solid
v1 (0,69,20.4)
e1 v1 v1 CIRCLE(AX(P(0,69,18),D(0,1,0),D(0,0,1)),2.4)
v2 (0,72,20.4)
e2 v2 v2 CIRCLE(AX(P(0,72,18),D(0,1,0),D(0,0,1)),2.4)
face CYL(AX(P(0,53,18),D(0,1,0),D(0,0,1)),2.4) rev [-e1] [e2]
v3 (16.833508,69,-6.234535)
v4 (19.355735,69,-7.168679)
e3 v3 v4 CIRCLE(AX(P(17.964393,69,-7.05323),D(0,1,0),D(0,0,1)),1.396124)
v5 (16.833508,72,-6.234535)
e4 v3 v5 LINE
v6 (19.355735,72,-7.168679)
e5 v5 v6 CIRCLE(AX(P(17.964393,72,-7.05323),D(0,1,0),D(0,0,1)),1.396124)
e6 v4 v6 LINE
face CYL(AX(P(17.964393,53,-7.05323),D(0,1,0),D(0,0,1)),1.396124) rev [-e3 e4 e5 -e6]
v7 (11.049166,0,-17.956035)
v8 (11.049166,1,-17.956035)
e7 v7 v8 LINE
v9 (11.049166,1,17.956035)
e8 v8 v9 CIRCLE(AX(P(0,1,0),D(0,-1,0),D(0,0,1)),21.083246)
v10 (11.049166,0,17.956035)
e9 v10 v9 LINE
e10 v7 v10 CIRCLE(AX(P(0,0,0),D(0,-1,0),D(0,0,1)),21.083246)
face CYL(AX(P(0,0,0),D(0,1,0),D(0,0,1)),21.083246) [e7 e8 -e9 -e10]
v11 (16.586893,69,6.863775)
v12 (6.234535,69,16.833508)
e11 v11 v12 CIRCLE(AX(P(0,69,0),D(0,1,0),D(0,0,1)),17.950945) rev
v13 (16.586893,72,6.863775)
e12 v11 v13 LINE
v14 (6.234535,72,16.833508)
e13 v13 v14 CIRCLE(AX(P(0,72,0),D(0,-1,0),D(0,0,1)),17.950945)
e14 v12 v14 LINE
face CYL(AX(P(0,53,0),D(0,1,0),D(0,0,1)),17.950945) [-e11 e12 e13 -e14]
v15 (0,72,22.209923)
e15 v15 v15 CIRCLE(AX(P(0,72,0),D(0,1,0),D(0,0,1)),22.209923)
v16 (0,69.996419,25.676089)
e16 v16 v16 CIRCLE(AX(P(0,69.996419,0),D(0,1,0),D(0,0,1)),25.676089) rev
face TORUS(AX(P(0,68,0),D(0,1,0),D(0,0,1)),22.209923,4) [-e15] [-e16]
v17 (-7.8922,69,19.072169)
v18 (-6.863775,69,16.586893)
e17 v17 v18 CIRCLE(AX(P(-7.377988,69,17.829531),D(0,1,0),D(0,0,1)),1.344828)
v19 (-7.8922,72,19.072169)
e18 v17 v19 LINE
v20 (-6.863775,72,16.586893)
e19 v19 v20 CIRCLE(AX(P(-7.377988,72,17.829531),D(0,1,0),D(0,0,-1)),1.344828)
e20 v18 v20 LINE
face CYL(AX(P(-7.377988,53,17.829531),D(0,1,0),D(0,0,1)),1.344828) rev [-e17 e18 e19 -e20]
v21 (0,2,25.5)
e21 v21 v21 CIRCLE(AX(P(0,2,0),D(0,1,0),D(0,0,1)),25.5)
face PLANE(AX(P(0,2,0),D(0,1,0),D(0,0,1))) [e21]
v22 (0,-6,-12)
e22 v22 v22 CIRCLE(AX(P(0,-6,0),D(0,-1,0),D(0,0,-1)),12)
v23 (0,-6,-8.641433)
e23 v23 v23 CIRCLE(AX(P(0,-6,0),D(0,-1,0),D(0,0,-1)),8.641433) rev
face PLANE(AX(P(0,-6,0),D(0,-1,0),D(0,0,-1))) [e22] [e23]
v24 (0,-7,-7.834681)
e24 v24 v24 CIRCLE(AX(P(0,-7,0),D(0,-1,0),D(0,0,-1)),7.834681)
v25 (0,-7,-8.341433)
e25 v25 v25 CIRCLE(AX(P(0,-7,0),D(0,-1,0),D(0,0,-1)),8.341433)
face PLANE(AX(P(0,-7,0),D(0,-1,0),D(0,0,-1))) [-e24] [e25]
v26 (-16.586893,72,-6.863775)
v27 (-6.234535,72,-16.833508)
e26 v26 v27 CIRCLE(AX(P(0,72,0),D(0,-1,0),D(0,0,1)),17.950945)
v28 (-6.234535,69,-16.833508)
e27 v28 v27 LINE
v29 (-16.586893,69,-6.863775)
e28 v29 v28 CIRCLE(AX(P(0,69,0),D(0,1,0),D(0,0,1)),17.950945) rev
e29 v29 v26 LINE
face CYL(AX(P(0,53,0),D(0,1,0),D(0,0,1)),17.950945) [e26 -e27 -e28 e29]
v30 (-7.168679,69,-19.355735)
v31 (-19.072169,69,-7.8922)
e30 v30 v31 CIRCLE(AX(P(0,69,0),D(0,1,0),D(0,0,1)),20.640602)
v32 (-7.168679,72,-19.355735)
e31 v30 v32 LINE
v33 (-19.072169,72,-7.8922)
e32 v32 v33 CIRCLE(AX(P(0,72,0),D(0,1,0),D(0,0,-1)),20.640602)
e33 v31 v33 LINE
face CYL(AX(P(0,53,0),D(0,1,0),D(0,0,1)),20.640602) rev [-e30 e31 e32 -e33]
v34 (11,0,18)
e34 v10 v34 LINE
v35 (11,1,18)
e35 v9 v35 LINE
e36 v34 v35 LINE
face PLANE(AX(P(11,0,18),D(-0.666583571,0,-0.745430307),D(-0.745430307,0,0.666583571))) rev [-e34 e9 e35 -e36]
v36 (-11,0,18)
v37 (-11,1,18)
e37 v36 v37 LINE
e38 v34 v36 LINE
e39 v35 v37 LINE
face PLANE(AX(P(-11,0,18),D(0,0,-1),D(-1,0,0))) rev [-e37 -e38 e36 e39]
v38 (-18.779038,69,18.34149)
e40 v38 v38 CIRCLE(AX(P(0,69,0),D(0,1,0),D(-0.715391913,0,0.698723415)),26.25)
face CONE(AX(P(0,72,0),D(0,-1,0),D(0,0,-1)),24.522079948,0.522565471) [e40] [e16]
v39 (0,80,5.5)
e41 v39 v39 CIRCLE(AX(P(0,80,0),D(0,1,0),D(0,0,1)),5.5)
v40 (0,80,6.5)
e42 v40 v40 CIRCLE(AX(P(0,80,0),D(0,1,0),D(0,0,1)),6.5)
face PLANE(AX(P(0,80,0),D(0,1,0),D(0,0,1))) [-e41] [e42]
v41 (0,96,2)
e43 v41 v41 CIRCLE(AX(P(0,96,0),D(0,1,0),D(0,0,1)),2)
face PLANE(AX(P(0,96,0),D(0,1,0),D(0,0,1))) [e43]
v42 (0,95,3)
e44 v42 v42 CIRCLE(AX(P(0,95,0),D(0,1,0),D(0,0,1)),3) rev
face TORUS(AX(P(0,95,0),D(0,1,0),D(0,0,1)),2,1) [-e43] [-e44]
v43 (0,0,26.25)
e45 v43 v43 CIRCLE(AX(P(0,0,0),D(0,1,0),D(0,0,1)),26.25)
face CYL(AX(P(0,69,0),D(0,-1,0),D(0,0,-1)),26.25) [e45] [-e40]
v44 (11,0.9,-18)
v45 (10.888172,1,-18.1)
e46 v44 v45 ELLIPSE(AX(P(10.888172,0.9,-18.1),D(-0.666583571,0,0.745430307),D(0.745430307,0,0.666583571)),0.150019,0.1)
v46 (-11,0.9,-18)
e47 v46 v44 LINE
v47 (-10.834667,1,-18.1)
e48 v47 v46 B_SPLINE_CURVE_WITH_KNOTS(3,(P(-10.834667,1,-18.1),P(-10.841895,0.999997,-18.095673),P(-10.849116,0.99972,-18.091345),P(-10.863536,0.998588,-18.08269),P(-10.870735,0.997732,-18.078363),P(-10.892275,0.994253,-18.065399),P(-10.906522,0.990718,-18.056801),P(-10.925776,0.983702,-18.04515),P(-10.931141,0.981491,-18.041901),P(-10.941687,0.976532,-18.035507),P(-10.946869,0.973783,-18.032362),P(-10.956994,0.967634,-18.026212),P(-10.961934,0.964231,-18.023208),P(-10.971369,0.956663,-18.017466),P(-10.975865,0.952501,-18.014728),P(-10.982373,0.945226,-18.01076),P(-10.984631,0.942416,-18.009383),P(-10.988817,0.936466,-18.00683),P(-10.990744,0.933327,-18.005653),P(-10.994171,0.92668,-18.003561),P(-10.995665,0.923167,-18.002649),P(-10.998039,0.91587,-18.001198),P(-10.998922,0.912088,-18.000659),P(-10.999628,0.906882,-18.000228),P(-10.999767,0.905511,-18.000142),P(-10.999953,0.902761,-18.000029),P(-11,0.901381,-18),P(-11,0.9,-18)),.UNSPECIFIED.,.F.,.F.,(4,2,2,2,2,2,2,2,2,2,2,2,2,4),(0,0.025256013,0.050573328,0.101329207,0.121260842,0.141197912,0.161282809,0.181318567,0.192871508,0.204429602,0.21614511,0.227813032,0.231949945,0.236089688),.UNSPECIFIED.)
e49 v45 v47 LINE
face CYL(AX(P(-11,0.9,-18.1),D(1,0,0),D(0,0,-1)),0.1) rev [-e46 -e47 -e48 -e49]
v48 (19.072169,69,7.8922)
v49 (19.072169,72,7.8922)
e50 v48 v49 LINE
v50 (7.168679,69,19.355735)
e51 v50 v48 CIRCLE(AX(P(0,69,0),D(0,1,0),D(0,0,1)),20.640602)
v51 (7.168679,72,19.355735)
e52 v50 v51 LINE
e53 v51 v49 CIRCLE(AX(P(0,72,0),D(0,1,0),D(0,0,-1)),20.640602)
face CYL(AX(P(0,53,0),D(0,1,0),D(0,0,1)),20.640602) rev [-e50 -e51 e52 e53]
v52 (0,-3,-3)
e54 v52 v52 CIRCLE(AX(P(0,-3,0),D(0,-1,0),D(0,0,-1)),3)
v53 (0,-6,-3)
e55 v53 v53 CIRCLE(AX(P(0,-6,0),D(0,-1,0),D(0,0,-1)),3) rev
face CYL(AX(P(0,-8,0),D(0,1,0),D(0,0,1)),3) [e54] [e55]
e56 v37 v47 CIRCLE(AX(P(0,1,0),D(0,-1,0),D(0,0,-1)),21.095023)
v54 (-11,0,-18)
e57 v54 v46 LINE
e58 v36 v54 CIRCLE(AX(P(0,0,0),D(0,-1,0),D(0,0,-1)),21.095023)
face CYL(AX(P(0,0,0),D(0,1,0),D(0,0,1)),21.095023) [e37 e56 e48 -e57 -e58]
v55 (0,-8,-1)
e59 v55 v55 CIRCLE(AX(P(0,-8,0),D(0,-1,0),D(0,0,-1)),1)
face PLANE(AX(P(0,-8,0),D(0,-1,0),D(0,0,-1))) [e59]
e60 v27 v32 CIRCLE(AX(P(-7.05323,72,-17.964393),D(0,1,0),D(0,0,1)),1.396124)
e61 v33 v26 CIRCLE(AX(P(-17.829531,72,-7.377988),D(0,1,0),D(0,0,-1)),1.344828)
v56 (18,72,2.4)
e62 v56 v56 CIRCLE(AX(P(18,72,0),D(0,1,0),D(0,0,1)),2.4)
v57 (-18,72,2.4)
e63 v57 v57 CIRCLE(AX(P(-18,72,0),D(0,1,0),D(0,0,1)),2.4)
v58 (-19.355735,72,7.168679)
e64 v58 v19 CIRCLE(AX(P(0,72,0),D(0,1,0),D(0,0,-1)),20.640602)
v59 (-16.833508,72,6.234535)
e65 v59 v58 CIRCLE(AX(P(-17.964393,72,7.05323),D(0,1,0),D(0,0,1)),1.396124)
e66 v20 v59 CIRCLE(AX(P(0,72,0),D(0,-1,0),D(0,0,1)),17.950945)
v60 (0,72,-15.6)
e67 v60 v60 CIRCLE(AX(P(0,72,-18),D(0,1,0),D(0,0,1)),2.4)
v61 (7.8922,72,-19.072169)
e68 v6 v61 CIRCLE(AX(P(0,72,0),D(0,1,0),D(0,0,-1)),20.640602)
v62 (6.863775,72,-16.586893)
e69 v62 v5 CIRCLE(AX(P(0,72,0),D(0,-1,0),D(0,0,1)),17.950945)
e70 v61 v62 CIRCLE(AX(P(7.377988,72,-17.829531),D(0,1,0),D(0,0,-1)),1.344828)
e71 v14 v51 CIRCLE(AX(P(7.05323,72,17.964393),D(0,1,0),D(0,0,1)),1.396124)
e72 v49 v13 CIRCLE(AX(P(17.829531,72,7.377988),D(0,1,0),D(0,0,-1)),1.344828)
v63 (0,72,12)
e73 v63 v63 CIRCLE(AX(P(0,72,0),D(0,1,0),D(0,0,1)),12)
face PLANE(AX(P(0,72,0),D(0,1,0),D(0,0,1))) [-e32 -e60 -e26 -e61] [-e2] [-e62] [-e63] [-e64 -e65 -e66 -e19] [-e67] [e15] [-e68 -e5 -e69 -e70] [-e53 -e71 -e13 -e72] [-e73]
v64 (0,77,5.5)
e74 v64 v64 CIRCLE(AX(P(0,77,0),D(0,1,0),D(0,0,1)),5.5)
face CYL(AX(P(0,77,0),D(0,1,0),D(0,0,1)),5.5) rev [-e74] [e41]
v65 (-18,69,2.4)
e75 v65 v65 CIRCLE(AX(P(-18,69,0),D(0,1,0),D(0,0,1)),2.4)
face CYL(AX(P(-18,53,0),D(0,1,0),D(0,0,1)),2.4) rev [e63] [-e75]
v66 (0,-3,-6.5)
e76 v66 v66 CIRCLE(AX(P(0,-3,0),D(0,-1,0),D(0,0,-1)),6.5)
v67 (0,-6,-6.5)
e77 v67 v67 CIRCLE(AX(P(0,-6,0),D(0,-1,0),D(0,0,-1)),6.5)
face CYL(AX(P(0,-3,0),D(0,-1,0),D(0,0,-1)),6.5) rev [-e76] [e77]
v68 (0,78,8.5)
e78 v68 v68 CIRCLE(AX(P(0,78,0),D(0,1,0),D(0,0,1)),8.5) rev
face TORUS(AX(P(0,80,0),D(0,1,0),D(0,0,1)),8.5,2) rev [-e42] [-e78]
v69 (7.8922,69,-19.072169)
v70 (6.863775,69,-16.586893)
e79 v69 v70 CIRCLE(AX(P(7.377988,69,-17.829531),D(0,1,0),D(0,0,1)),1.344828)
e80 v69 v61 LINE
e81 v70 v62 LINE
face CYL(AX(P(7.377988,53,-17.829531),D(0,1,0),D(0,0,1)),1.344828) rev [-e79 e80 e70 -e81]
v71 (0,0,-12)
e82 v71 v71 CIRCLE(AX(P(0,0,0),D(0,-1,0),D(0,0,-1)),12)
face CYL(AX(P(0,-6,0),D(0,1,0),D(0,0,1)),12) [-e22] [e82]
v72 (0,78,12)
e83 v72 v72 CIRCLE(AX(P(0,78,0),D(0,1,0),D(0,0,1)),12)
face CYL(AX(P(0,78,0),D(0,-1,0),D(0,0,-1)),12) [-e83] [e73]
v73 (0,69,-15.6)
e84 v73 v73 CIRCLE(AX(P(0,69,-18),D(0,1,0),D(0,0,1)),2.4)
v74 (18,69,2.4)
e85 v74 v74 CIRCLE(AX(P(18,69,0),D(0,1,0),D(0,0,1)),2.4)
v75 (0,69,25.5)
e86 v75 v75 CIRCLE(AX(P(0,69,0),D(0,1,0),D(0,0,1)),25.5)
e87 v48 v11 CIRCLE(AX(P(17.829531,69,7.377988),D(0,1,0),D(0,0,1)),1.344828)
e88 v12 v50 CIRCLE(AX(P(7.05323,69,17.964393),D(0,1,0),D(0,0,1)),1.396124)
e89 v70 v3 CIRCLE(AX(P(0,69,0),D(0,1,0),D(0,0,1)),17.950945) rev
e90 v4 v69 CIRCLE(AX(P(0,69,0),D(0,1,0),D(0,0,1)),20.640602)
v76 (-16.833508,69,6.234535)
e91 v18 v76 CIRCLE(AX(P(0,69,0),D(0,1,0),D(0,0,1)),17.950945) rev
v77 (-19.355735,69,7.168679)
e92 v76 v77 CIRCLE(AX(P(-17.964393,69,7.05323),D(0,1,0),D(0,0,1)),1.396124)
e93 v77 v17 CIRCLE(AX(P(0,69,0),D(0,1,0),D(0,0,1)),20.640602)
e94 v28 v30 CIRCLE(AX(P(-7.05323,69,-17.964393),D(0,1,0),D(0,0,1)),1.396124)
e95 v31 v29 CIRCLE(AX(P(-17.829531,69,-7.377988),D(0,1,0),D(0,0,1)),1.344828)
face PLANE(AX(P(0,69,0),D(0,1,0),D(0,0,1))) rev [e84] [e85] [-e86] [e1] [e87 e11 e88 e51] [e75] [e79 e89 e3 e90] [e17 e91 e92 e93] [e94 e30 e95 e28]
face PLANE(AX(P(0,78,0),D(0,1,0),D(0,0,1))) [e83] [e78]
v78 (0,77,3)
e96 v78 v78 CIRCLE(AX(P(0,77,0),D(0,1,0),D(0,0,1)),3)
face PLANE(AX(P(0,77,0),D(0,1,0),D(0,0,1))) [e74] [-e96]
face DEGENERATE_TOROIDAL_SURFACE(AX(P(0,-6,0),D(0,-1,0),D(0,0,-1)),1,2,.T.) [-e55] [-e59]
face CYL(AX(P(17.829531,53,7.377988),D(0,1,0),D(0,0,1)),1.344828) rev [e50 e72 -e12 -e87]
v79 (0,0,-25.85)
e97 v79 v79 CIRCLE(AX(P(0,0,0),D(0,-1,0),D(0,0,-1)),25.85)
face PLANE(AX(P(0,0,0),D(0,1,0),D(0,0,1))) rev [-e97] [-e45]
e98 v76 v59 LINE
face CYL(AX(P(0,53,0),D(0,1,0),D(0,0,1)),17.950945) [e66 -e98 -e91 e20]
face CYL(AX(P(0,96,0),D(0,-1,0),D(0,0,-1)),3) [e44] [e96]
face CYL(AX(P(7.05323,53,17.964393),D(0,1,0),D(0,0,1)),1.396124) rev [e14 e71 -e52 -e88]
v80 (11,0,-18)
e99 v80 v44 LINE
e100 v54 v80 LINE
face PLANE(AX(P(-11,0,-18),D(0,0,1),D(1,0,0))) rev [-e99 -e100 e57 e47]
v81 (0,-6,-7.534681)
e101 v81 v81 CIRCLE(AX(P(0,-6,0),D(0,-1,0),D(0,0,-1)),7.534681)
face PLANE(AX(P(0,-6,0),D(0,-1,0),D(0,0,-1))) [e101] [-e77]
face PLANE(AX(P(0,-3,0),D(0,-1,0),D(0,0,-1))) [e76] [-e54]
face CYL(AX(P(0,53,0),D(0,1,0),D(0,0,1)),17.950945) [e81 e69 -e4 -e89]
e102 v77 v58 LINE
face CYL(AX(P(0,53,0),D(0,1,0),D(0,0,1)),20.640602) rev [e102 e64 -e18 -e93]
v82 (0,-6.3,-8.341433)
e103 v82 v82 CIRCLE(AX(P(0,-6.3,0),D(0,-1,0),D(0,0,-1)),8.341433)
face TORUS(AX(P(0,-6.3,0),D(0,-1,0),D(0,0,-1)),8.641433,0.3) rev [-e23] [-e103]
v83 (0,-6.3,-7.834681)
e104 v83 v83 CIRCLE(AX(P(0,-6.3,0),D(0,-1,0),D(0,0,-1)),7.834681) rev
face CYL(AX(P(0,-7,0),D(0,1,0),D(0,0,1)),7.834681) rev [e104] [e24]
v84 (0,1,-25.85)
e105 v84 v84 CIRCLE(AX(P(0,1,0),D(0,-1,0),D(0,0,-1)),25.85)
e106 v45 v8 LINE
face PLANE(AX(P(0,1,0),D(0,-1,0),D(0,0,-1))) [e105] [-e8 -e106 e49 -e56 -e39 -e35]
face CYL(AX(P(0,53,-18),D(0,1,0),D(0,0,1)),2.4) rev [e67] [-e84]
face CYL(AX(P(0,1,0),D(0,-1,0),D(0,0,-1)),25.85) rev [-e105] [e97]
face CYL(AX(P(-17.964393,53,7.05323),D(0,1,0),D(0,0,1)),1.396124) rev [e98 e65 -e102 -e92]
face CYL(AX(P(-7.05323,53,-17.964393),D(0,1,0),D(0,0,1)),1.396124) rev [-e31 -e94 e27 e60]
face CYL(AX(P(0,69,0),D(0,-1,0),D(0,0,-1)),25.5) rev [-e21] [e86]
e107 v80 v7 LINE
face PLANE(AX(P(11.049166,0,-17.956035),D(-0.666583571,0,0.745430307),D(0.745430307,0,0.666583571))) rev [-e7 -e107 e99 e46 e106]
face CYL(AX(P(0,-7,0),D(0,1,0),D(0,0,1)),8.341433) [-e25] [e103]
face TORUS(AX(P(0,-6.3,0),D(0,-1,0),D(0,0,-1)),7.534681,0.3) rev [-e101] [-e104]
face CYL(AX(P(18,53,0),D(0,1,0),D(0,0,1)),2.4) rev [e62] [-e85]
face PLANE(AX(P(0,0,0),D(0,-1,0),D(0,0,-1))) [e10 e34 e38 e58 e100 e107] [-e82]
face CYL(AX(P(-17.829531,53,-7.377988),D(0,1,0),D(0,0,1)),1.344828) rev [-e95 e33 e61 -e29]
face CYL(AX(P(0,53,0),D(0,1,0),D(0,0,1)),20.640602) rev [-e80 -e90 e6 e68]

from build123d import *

# Parameters (mm, degrees)
SKETCH1_R            = 26.25
SKETCH1_R_2          = 25.5
BOSS_EXTRUDE1_DEPTH  = 69
SKETCH2_R            = 26.25
BOSS_EXTRUDE2_DEPTH  = 2
SKETCH3_R            = 24.522079948
BOSS_EXTRUDE3_DEPTH  = 1
FILLET1_R            = 4
SKETCH4_R            = 12
BOSS_EXTRUDE4_DEPTH  = 6
SKETCH5_R            = 6.5
BOSS_EXTRUDE5_DEPTH  = 2
SKETCH6_R            = 5.5
CUT_EXTRUDE1_DEPTH   = 3
FILLET3_R            = 2
SKETCH7_R            = 3
BOSS_EXTRUDE6_DEPTH  = 19
FILLET4_R            = 1
SKETCH9_R            = 2.4
CUT_EXTRUDE2_DEPTH   = 19
CUT_EXTRUDE3_DEPTH   = 19
SKETCH12_R           = 25.85
CUT_EXTRUDE4_DEPTH   = 1
BOSS_EXTRUDE7_DEPTH  = 1
FILLET6_R            = 0.1
BOSS_EXTRUDE8_START  = 6
SKETCH15_R           = 12
BOSS_EXTRUDE8_DEPTH  = 6
SKETCH16_R           = 6.5
CUT_EXTRUDE5_DEPTH   = 3
SKETCH17_R           = 8.341433134
SKETCH17_R_2         = 7.834680873
BOSS_EXTRUDE9_DEPTH  = 1
FILLET9_R            = 0.3
FILLET10_R           = 0.3
BOSS_EXTRUDE10_START = 5
SKETCH18_R           = 3
BOSS_EXTRUDE10_DEPTH = 5
FILLET11_R           = 2


# Read off the part's stored shape, not the designer's step: Boundary1
with BuildPart() as part:
    # Sketch1 → Boss-Extrude1 (new body)
    with BuildSketch(Plane(origin=(0, 0, 0), x_dir=(1, 0, 0), z_dir=(0, 1, 0))):
        with Locations(Location((0, 0, 0), (0, 0, 270))):
            Circle(SKETCH1_R)
        with Locations(Location((0, 0, 0), (0, 0, 270))):
            Circle(SKETCH1_R_2, mode=Mode.SUBTRACT)
    extrude(amount=BOSS_EXTRUDE1_DEPTH)

    # Sketch2 → Boss-Extrude2 (add)
    with BuildSketch(Plane(origin=(0, 0, 0), x_dir=(1, 0, 0), z_dir=(0, 1, 0))):
        with Locations(Location((0, 0, 0), (0, 0, 270))):
            Circle(SKETCH2_R)
    extrude(amount=BOSS_EXTRUDE2_DEPTH)



with BuildPart() as body_2:
    # Sketch3 → Boss-Extrude3 (new body)
    with BuildSketch(Plane(origin=(0, 71, 0), x_dir=(1, 0, 0), z_dir=(0, 1, 0))):
        with Locations(Location((0, 0, 0), (0, 0, 270))):
            Circle(SKETCH3_R)
    extrude(amount=BOSS_EXTRUDE3_DEPTH)


with BuildPart() as part_1:
    add(part.part)

    add(body_2.part)  # Boundary1 merges body 2
    # Boundary1 outline → Boundary1 (revolve)
    with BuildSketch(Plane.XY):
        Polygon((24.522079948, 72), (24.522079948, 71), (0, 71), (0, 69), (26.25, 69), align=None)
    revolve(axis=Axis((0, 0, 0), (0, 1, 0)))

    # Fillet1
    fillet1_edges = [part_1.edges().sort_by_distance(p)[0] for p in [
        (-24.522079948, 72, 0),
    ]]
    fillet(fillet1_edges, radius=FILLET1_R)

    # Sketch4 → Boss-Extrude4 (add)
    with BuildSketch(Plane(origin=(0, 72, 0), x_dir=(1, 0, 0), z_dir=(0, 1, 0))):
        with Locations(Location((0, 0, 0), (0, 0, 270))):
            Circle(SKETCH4_R)
    extrude(amount=BOSS_EXTRUDE4_DEPTH)

    # Sketch5 → Boss-Extrude5 (add)
    with BuildSketch(Plane(origin=(0, 78, 0), x_dir=(1, 0, 0), z_dir=(0, 1, 0))):
        with Locations(Location((0, 0, 0), (0, 0, 270))):
            Circle(SKETCH5_R)
    extrude(amount=BOSS_EXTRUDE5_DEPTH)

    # Sketch6 → Cut-Extrude1 (cut)
    with BuildSketch(Plane(origin=(0, 80, 0), x_dir=(1, 0, 0), z_dir=(0, 1, 0))):
        with Locations(Location((0, 0, 0), (0, 0, 270))):
            Circle(SKETCH6_R)
    extrude(amount=-CUT_EXTRUDE1_DEPTH, mode=Mode.SUBTRACT)

    # Fillet3
    fillet3_edges = [part_1.edges().sort_by_distance(p)[0] for p in [
        (0, 78, -6.5),
    ]]
    fillet(fillet3_edges, radius=FILLET3_R - 0.0001)  # a hair under: the kernel refuses the full size

    # Sketch7 → Boss-Extrude6 (add)
    with BuildSketch(Plane(origin=(0, 77, 0), x_dir=(1, 0, 0), z_dir=(0, 1, 0))):
        with Locations(Location((0, 0, 0), (0, 0, 270))):
            Circle(SKETCH7_R)
    extrude(amount=BOSS_EXTRUDE6_DEPTH)

    # Fillet4
    fillet4_edges = [part_1.edges().sort_by_distance(p)[0] for p in [
        (0, 96, -3),
    ]]
    fillet(fillet4_edges, radius=FILLET4_R)

    # Sketch9 → Cut-Extrude2 (cut)
    with BuildSketch(Plane(origin=(0, 72, 0), x_dir=(1, 0, 0), z_dir=(0, 1, 0))):
        with Locations(Location((0, 18, 0), (0, 0, 270))):
            Circle(SKETCH9_R)
        with Locations(Location((18, 0, 0), (0, 0, 270))):
            Circle(SKETCH9_R)
        with Locations(Location((0, -18, 0), (0, 0, 270))):
            Circle(SKETCH9_R)
        with Locations(Location((-18, 0, 0), (0, 0, 270))):
            Circle(SKETCH9_R)
    extrude(amount=-CUT_EXTRUDE2_DEPTH, mode=Mode.SUBTRACT)

    # Sketch10 → Cut-Extrude3 (cut)
    with BuildSketch(Plane(origin=(0, 72, 0), x_dir=(1, 0, 0), z_dir=(0, 1, 0))):
        with BuildLine():
            ThreePointArc((7.892200083, 19.072168819), (14.867271563, 14.317775032), (19.355735292, 7.168678881))
            ThreePointArc((19.355735292, 7.168678881), (18.449280331, 5.744014287), (16.833508421, 6.234535371))
            ThreePointArc((16.833508421, 6.234535371), (12.929931995, 12.452039818), (6.863775235, 16.586893216))
            ThreePointArc((6.863775235, 16.586893216), (6.135349858, 18.343743441), (7.892200083, 19.072168819))
        make_face()
        with BuildLine():
            ThreePointArc((6.234535371, -16.833508421), (12.452039818, -12.929931995), (16.586893216, -6.863775235))
            ThreePointArc((16.586893216, -6.863775235), (18.343743441, -6.135349858), (19.072168819, -7.892200083))
            ThreePointArc((19.072168819, -7.892200083), (14.317775032, -14.867271563), (7.168678881, -19.355735292))
            ThreePointArc((7.168678881, -19.355735292), (5.744014287, -18.449280331), (6.234535371, -16.833508421))
        make_face()
        with BuildLine():
            ThreePointArc((-16.833508421, -6.234535371), (-12.929931995, -12.452039818), (-6.863775235, -16.586893216))
            ThreePointArc((-6.863775235, -16.586893216), (-6.135349858, -18.343743441), (-7.892200083, -19.072168819))
            ThreePointArc((-7.892200083, -19.072168819), (-14.867271563, -14.317775032), (-19.355735292, -7.168678881))
            ThreePointArc((-19.355735292, -7.168678881), (-18.449280331, -5.744014287), (-16.833508421, -6.234535371))
        make_face()
        with BuildLine():
            ThreePointArc((-6.234535371, 16.833508421), (-12.452039818, 12.929931995), (-16.586893216, 6.863775235))
            ThreePointArc((-16.586893216, 6.863775235), (-18.343743441, 6.135349858), (-19.072168819, 7.892200083))
            ThreePointArc((-19.072168819, 7.892200083), (-14.317775032, 14.867271563), (-7.168678881, 19.355735292))
            ThreePointArc((-7.168678881, 19.355735292), (-5.744014287, 18.449280331), (-6.234535371, 16.833508421))
        make_face()
    extrude(amount=-CUT_EXTRUDE3_DEPTH, mode=Mode.SUBTRACT)

    # Sketch12 → Cut-Extrude4 (cut)
    with BuildSketch(Plane.XZ):
        with Locations(Location((0, 0, 0), (0, 0, 270))):
            Circle(SKETCH12_R)
    extrude(amount=-CUT_EXTRUDE4_DEPTH, mode=Mode.SUBTRACT)

    # Sketch13 → Boss-Extrude7 (add)
    with BuildSketch(Plane.XZ.offset(-1)):
        with BuildLine():
            Line((-11, -18), (11, -18))
            Line((11, -18), (11.049165655, -17.956034766))
            ThreePointArc((11.049165655, -17.956034766), (21.083245628, 0), (11.049165655, 17.956034766))
            Line((11.049165655, 17.956034766), (11, 18))
            Line((11, 18), (-11, 18))
            ThreePointArc((-11, 18), (-21.09502311, 0), (-11, -18))
        make_face()
    extrude(amount=BOSS_EXTRUDE7_DEPTH)

    # Fillet6
    fillet6_edges = [part_1.edges().sort_by_distance(p)[0] for p in [
        (0, 1, -18),
    ]]
    fillet(fillet6_edges, radius=FILLET6_R)

    # Sketch15 → Boss-Extrude8 (add)
    with BuildSketch(Plane.XZ.offset(BOSS_EXTRUDE8_START)):
        with Locations(Location((0, 0, 0), (0, 0, 90))):
            Circle(SKETCH15_R)
    extrude(amount=-BOSS_EXTRUDE8_DEPTH)

    # Sketch16 → Cut-Extrude5 (cut)
    with BuildSketch(Plane.XZ.offset(6)):
        with Locations(Location((0, 0, 0), (0, 0, 270))):
            Circle(SKETCH16_R)
    extrude(amount=-CUT_EXTRUDE5_DEPTH, mode=Mode.SUBTRACT)

    # Sketch17 → Boss-Extrude9 (add)
    with BuildSketch(Plane.XZ.offset(6)):
        with Locations(Location((0, 0, 0), (0, 0, 270))):
            Circle(SKETCH17_R)
        with Locations(Location((0, 0, 0), (0, 0, 270))):
            Circle(SKETCH17_R_2, mode=Mode.SUBTRACT)
    extrude(amount=BOSS_EXTRUDE9_DEPTH)

    # Fillet9
    fillet9_edges = [part_1.edges().sort_by_distance(p)[0] for p in [
        (0, -6, 8.341433134),
    ]]
    fillet(fillet9_edges, radius=FILLET9_R)

    # Fillet10
    fillet10_edges = [part_1.edges().sort_by_distance(p)[0] for p in [
        (0, -6, 7.834680873),
    ]]
    fillet(fillet10_edges, radius=FILLET10_R)

    # Sketch18 → Boss-Extrude10 (add)
    with BuildSketch(Plane.XZ.offset(3).offset(BOSS_EXTRUDE10_START)):
        with Locations(Location((0, 0, 0), (0, 0, 90))):
            Circle(SKETCH18_R)
    extrude(amount=-BOSS_EXTRUDE10_DEPTH)

    # Fillet11
    fillet11_edges = [part_1.edges().sort_by_distance(p)[0] for p in [
        (0, -8, -3),
    ]]
    fillet(fillet11_edges, radius=FILLET11_R)


solid = part_1.part
